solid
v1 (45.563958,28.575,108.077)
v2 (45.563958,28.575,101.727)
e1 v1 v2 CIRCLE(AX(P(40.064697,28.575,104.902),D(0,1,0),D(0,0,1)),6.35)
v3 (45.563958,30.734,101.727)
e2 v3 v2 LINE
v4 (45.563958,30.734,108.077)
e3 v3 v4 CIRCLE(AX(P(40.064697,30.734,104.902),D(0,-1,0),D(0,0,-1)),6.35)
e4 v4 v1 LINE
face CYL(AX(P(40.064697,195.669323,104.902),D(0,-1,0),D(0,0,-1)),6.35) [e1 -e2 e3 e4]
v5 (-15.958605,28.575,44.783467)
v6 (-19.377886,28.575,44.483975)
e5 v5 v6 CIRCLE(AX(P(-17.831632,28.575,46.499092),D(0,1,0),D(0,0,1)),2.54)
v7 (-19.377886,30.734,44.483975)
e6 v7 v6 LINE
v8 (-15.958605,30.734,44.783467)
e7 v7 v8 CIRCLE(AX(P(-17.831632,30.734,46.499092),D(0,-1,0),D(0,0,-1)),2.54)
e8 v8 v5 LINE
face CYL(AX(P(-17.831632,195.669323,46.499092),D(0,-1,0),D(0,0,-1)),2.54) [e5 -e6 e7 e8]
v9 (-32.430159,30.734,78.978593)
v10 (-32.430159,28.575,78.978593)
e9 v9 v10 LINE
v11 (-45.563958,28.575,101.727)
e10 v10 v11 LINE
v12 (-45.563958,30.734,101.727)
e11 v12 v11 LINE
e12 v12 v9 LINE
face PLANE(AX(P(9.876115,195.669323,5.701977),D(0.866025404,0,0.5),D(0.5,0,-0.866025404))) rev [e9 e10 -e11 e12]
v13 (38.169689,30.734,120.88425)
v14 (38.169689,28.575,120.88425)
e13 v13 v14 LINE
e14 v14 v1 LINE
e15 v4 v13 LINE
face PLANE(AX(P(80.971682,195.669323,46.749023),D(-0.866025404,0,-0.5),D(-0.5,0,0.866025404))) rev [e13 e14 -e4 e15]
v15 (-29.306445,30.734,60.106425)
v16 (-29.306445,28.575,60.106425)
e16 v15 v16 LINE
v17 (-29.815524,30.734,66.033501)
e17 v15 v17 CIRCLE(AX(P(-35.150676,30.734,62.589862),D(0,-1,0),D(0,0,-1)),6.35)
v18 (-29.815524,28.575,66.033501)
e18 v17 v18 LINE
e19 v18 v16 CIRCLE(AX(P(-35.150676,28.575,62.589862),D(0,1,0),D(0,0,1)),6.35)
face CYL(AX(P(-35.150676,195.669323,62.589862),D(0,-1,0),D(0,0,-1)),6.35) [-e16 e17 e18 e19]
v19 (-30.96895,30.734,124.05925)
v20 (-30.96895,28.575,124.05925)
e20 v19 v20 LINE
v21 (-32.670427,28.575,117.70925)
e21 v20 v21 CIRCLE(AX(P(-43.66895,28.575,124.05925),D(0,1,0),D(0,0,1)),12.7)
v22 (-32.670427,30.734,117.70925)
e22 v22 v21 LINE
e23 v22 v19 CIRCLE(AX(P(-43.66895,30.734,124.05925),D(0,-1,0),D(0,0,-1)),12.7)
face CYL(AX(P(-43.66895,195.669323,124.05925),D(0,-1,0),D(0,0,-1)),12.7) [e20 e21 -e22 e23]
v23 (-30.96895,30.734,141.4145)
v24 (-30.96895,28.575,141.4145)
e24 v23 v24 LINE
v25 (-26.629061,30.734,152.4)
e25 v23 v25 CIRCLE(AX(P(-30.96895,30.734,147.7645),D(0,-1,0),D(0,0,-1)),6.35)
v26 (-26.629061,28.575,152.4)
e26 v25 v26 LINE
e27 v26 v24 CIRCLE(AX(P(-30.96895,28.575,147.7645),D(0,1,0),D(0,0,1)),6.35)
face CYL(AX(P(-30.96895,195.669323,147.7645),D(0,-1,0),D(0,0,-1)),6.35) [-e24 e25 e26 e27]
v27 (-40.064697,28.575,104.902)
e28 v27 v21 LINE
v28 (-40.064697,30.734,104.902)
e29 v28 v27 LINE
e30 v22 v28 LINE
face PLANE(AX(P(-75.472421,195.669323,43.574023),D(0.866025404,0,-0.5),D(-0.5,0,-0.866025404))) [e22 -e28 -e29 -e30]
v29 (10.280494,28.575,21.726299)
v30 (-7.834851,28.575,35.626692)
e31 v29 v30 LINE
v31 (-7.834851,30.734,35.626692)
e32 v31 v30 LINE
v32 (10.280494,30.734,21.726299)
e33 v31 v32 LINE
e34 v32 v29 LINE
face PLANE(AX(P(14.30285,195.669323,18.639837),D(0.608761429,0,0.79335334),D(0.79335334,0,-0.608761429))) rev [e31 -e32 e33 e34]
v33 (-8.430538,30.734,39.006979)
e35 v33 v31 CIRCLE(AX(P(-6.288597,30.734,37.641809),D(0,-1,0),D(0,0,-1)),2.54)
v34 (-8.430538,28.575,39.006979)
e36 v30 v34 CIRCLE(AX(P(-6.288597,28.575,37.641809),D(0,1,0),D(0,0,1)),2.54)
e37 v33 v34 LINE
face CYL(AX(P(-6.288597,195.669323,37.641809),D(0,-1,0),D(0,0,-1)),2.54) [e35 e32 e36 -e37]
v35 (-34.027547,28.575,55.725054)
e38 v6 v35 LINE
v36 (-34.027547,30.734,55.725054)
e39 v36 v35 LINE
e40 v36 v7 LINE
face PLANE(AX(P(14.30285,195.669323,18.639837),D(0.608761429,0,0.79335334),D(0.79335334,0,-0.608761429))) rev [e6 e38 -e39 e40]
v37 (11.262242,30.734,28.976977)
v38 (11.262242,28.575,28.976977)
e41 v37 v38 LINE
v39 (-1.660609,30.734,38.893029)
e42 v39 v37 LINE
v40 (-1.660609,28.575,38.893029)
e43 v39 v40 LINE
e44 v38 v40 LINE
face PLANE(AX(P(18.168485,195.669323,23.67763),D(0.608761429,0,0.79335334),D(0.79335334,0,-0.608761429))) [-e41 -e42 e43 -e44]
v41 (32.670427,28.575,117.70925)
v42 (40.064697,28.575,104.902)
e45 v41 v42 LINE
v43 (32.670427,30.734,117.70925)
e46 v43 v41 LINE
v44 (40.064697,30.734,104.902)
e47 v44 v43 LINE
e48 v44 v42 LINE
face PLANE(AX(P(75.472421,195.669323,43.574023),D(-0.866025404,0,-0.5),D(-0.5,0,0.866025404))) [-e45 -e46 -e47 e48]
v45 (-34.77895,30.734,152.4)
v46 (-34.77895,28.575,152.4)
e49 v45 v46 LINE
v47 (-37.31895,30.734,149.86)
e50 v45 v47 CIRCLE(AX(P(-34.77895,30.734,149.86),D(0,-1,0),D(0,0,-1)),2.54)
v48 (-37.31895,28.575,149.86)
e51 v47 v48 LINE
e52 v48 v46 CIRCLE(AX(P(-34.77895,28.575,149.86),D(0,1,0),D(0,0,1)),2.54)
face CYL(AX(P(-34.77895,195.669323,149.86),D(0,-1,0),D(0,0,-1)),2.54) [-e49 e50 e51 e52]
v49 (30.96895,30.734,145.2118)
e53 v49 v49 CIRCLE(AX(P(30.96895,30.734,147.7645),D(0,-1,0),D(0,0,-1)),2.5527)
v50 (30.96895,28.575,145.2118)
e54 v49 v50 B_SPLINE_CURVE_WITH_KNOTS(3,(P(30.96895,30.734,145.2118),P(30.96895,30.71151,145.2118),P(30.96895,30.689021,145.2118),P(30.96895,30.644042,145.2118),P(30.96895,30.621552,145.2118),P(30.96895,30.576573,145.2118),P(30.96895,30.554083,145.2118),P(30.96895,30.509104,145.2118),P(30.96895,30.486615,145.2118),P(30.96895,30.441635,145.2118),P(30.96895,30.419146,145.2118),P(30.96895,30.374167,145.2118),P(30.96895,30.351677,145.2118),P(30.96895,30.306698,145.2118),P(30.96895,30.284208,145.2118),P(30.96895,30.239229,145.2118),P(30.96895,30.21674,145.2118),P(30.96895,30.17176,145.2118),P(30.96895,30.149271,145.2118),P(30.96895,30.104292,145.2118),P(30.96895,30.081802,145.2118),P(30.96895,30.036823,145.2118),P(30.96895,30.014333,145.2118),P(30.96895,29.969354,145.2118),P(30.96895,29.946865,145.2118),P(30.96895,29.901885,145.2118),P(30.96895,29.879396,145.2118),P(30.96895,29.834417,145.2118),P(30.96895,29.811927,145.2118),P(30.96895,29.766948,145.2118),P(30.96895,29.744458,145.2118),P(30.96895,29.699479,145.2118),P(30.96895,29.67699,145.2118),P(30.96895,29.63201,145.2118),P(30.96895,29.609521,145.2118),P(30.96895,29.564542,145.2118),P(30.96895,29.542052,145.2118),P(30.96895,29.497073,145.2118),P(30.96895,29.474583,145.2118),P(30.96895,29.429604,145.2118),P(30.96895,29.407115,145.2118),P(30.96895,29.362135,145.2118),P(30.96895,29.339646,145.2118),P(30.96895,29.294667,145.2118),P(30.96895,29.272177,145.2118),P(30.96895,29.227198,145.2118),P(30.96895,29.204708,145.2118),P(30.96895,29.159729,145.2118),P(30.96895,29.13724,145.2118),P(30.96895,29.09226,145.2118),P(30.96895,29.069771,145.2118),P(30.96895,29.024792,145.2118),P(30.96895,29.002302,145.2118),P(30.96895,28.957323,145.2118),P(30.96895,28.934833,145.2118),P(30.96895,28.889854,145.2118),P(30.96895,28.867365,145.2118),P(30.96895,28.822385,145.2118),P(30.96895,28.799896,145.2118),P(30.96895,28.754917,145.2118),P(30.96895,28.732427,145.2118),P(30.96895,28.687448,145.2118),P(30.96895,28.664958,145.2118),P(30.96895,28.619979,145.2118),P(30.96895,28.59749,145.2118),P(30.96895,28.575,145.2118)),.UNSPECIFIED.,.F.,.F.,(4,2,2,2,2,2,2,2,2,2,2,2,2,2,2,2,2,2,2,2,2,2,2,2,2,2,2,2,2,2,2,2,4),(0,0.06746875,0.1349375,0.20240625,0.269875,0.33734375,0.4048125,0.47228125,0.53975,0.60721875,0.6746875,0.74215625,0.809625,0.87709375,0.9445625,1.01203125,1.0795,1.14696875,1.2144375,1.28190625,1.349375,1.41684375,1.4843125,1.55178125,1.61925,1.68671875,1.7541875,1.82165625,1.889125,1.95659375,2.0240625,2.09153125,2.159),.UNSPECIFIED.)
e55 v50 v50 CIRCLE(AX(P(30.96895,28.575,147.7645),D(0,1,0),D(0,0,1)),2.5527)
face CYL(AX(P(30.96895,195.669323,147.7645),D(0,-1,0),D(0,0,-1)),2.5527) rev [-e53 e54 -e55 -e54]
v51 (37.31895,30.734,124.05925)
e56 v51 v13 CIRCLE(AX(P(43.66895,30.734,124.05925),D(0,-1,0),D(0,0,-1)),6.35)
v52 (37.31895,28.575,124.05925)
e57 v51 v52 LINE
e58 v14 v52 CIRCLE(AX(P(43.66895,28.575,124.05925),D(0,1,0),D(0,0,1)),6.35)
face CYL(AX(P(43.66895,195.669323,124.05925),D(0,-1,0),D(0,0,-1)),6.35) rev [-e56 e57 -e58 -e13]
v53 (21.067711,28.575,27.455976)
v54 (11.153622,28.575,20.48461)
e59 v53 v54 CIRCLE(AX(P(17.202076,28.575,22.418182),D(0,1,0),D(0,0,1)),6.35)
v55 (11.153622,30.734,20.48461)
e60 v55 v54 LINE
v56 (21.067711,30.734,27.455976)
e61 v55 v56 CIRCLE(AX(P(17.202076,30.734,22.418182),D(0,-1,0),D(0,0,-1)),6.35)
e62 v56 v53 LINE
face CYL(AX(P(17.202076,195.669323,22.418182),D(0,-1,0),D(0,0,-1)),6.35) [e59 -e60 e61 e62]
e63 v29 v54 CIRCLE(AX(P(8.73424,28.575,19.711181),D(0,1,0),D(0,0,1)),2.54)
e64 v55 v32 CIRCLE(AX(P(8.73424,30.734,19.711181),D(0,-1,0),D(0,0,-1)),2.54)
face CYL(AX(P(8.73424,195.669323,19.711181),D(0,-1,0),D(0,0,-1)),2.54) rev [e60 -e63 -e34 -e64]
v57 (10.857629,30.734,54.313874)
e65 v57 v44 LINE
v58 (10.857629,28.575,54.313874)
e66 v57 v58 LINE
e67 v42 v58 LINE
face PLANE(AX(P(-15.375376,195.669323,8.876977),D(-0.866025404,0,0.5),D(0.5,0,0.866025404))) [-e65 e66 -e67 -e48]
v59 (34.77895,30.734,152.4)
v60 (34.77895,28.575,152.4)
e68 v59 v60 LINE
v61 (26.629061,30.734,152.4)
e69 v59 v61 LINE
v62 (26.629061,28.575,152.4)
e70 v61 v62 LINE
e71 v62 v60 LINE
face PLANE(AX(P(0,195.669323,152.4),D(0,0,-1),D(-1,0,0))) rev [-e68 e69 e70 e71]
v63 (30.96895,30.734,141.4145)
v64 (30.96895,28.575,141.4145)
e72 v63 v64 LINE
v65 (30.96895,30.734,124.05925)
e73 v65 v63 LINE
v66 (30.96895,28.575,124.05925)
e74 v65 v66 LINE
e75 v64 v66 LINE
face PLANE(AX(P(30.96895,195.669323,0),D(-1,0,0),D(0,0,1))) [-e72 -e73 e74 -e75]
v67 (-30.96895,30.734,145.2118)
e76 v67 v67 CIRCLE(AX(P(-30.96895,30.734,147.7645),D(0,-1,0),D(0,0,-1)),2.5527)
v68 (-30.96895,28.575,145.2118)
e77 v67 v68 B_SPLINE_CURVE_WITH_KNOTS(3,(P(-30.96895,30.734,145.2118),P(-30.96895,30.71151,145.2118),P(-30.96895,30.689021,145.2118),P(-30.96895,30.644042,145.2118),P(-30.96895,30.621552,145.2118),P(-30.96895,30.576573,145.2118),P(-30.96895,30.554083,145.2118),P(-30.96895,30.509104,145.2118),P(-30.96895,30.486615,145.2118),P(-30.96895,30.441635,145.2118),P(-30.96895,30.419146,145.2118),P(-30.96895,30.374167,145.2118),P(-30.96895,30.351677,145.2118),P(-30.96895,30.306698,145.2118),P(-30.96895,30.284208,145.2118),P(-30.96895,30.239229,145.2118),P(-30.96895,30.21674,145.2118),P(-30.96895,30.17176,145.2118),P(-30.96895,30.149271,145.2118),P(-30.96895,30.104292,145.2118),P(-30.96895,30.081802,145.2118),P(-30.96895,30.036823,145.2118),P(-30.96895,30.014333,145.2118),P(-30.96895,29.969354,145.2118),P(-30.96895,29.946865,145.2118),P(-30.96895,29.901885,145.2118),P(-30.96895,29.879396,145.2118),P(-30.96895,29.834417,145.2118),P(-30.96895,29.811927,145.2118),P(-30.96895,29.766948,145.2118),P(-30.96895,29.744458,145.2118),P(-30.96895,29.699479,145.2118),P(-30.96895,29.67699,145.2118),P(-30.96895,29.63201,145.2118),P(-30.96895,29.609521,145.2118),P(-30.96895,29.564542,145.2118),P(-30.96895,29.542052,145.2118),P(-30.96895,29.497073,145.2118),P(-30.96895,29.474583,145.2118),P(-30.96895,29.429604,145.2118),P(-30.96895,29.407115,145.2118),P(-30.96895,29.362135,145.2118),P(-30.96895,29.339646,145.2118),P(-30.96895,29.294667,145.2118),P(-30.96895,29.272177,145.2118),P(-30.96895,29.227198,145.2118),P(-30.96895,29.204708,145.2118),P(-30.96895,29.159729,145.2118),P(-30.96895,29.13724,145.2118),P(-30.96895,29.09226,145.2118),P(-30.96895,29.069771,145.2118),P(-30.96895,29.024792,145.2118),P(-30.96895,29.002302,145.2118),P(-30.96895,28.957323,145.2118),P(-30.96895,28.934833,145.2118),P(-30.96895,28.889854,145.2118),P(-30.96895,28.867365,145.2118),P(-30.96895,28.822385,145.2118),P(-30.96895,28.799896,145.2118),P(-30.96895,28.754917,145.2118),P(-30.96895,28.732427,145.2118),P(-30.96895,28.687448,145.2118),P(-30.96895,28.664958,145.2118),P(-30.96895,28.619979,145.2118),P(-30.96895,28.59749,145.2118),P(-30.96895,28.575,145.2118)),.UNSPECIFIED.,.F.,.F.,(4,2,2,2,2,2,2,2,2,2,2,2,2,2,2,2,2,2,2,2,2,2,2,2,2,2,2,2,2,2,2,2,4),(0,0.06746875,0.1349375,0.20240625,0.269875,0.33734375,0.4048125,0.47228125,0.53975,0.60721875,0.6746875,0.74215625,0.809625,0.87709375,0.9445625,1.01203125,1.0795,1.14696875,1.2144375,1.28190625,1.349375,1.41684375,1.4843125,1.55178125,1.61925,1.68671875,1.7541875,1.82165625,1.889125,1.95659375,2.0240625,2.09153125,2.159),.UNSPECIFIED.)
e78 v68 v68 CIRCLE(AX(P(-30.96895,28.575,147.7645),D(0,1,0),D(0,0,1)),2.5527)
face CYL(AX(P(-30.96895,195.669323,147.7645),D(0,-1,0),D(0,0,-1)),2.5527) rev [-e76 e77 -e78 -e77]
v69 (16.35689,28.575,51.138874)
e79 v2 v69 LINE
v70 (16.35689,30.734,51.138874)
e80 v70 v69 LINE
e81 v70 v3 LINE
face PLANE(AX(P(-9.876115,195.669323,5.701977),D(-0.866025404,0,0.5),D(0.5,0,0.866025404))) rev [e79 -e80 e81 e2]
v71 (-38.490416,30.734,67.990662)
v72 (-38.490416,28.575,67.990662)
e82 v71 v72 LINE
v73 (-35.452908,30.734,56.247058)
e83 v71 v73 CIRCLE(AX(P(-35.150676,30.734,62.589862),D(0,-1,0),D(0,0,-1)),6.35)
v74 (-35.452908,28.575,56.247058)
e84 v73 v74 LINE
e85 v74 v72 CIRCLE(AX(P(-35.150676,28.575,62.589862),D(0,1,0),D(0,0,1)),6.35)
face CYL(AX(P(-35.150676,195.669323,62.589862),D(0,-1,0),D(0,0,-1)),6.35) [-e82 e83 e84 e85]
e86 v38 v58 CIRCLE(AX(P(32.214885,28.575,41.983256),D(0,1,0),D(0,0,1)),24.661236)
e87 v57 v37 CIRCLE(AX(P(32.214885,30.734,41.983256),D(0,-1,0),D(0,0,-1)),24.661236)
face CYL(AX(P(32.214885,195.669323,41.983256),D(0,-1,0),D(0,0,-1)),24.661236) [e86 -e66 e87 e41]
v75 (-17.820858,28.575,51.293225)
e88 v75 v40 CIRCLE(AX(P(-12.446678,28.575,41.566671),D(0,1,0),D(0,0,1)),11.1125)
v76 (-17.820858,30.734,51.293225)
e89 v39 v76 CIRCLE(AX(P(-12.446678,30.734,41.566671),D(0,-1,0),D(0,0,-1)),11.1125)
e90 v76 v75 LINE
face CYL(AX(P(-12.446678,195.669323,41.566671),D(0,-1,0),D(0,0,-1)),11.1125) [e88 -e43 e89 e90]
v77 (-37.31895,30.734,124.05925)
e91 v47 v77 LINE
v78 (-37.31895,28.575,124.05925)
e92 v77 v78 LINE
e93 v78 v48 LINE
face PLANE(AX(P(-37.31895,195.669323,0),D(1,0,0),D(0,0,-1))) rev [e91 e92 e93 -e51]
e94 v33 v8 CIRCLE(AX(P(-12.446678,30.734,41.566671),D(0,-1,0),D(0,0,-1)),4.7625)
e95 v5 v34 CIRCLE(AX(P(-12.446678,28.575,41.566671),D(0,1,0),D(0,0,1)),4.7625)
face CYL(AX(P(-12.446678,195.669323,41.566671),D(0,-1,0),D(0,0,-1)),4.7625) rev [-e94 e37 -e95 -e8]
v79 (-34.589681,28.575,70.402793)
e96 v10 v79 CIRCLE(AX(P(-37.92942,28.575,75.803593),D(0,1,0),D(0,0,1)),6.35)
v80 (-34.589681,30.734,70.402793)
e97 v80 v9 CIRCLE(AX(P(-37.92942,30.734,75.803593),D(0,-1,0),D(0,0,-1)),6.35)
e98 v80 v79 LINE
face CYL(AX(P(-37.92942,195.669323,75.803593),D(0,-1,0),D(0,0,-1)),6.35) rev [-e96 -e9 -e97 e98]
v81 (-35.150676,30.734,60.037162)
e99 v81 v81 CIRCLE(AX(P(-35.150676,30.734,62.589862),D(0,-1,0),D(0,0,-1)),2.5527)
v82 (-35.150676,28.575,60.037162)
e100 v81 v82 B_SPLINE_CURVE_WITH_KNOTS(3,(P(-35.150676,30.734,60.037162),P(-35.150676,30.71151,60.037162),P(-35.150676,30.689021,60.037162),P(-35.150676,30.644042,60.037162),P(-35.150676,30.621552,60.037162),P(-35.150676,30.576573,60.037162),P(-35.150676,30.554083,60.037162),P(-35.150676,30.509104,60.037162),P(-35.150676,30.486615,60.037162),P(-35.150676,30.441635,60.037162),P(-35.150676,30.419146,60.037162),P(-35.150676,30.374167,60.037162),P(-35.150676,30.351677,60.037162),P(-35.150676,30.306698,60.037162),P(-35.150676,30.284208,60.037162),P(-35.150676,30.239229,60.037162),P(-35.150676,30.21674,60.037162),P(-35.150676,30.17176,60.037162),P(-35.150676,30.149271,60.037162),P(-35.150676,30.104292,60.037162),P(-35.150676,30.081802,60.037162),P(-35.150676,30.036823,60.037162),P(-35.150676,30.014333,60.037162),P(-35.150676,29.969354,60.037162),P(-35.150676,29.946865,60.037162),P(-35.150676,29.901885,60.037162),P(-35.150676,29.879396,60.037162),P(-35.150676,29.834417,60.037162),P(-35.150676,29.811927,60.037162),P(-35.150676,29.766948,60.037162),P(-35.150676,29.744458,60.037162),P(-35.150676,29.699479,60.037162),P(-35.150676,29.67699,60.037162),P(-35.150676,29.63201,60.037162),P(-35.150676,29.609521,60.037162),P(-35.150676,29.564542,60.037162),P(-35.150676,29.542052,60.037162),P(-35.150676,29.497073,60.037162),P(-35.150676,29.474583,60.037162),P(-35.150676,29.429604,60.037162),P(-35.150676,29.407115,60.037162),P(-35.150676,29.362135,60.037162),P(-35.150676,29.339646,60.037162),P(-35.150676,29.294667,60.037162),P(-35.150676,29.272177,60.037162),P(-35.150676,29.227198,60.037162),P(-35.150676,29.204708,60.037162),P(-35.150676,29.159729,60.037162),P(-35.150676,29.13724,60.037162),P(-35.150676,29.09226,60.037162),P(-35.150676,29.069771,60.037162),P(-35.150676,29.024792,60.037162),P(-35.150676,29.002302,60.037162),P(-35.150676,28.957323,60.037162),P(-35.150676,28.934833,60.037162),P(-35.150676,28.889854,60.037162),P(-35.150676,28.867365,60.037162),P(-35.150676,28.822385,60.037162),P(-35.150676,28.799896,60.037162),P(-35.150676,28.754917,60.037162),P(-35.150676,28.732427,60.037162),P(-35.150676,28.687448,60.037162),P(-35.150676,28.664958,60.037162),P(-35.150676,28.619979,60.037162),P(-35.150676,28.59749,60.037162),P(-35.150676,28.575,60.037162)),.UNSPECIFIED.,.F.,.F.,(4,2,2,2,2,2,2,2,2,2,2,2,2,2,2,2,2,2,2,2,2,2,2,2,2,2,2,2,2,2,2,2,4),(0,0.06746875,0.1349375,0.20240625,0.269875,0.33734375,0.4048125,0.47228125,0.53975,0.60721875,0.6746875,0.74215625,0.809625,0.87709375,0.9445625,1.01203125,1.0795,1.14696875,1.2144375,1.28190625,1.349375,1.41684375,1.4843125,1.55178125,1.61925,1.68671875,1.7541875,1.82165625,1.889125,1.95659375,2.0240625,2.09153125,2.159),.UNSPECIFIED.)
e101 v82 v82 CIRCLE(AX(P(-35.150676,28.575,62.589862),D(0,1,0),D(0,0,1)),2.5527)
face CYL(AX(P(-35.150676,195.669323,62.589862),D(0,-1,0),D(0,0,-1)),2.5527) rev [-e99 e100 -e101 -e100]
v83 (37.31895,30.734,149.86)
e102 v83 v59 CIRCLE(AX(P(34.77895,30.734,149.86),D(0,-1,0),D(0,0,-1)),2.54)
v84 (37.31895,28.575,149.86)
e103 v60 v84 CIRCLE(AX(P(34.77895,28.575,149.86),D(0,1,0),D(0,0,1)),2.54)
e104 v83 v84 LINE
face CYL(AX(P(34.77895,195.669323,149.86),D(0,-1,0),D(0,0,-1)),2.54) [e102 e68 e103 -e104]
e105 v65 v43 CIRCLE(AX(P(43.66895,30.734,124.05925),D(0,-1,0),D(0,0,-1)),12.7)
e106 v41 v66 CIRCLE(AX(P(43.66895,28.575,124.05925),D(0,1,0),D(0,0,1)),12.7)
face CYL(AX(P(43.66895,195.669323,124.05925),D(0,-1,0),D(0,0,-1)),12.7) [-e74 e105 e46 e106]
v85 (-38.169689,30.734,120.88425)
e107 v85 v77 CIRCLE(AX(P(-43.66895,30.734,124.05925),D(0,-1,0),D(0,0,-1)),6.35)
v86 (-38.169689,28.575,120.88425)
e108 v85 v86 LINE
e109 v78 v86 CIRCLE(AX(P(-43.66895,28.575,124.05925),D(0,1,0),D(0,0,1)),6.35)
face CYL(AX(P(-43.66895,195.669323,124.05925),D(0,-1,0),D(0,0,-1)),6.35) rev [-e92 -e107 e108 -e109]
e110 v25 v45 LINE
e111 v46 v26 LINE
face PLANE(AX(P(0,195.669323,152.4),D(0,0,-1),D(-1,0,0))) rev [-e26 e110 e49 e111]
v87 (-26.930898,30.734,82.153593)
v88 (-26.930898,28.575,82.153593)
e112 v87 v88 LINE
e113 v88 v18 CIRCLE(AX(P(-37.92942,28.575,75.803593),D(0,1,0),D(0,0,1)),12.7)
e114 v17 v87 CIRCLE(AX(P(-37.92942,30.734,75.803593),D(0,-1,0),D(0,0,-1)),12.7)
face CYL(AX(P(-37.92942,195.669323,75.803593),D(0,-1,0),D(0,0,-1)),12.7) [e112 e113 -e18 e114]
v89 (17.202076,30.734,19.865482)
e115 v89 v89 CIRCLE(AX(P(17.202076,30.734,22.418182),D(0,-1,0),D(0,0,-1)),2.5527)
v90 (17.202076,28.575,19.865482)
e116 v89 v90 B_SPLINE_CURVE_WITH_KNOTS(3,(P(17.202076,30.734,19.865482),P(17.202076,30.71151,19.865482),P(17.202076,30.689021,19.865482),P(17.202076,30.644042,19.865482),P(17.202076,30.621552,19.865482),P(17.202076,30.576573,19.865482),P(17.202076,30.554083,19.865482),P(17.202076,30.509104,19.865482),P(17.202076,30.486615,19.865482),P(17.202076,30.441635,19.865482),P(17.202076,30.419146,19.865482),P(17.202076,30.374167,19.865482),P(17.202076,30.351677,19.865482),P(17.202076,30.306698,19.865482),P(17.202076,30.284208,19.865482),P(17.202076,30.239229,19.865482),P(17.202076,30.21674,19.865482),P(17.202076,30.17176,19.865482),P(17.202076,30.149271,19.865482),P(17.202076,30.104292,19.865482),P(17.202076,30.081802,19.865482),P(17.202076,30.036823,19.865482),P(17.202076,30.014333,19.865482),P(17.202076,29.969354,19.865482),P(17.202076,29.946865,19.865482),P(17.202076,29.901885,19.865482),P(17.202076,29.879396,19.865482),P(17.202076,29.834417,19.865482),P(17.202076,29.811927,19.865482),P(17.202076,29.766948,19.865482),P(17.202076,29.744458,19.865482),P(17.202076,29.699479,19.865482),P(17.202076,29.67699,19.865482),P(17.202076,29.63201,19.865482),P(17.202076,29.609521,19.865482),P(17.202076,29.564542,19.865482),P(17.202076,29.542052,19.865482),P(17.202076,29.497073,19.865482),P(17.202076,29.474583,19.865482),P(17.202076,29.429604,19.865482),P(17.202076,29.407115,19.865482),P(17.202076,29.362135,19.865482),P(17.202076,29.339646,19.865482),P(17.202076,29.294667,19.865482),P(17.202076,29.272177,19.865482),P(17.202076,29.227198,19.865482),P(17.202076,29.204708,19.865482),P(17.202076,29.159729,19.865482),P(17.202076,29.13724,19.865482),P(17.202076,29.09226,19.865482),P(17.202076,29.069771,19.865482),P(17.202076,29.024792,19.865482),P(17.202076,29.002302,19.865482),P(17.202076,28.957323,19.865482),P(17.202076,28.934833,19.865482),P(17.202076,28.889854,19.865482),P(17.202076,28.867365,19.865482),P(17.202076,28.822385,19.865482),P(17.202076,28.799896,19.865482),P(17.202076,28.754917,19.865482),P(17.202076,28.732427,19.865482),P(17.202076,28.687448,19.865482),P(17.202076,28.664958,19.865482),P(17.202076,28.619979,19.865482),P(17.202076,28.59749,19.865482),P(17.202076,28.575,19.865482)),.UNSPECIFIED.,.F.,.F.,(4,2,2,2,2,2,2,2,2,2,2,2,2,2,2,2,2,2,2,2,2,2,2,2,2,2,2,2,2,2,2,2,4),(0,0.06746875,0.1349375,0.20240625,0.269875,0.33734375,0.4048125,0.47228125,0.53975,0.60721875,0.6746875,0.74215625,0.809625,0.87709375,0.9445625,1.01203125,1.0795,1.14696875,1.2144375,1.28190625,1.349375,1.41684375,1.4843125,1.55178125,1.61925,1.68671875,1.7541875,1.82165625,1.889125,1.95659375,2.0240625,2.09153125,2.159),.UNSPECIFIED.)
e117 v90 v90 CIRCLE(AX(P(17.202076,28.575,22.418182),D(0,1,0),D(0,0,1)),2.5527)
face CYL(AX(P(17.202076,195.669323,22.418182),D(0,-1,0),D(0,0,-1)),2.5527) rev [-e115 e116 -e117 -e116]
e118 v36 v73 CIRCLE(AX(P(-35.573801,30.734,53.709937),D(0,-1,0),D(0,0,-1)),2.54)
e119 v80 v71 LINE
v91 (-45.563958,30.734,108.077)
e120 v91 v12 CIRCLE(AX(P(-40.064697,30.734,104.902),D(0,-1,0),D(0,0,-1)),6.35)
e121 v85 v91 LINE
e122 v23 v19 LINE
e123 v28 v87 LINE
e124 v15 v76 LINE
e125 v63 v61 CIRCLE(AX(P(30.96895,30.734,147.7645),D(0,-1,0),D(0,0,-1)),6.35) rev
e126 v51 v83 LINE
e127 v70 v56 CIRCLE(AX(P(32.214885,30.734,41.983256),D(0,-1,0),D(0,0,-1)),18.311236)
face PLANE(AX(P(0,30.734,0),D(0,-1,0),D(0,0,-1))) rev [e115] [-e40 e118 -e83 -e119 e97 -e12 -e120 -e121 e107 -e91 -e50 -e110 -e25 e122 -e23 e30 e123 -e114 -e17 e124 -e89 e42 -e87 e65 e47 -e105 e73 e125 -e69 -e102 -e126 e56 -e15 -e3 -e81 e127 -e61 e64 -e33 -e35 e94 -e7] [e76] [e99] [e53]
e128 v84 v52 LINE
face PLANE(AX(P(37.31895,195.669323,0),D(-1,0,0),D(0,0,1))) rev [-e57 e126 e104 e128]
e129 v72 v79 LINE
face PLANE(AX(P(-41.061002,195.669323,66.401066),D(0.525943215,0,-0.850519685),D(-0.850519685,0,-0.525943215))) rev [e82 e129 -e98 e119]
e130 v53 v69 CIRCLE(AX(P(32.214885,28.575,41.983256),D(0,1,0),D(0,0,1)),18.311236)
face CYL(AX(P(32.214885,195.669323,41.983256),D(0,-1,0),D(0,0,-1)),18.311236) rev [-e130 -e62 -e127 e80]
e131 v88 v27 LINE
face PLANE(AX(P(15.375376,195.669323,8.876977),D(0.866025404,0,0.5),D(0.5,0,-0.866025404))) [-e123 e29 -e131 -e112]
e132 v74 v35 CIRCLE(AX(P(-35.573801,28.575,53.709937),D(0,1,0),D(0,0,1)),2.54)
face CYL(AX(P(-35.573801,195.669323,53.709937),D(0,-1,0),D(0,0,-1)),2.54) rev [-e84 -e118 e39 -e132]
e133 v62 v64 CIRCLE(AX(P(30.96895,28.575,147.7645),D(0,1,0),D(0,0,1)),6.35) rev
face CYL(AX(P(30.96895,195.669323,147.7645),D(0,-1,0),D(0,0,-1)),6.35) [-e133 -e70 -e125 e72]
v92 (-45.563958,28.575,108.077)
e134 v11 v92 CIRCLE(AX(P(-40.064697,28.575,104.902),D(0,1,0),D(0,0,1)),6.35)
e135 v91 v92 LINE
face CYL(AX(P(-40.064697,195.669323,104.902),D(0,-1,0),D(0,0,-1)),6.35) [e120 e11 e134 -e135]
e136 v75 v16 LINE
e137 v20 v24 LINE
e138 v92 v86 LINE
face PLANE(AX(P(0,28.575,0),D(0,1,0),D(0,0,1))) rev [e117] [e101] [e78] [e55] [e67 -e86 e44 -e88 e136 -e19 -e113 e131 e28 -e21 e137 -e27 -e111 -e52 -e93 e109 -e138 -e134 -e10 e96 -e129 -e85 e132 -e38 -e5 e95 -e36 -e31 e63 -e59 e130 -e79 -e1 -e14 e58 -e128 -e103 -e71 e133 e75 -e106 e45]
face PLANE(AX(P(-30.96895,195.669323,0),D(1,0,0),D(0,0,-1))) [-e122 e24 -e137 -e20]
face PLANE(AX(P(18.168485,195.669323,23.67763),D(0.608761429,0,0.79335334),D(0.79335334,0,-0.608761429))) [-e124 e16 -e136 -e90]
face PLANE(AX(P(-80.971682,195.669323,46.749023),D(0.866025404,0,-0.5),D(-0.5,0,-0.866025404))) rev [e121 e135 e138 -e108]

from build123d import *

# Parameters (mm, degrees)
SKETCH44_R              = 2.5527
TOP_PLATE_EXTRUDE_DEPTH = 3.175
SKETCH82_R              = 4.7625
CUT_EXTRUDE38_DEPTH     = 3.175
SKETCH72_W              = 4.7498
SKETCH72_H              = 17.4625
SKETCH72_W_2            = 49.2125
SKETCH72_H_2            = 3.0226
SKETCH72_H_3            = 18.806813894
SKETCH72_W_3            = 12.7
SKETCH72_H_4            = 9.525
BOSS_EXTRUDE27_DEPTH    = 3.175
SKETCH86_R              = 6.35
SKETCH86_R_2            = 2.5527
BOSS_EXTRUDE31_DEPTH    = 3.175
SKETCH111_W             = 17.7673
SKETCH111_H             = 10.0965
CUT_EXTRUDE57_DEPTH     = 191.266761417
SKETCH92_W              = 4.859785226
SKETCH92_H              = 15.6845
SKETCH92_W_2            = 4.8768
SKETCH92_H_2            = 22.987
SKETCH92_W_3            = 6.1468
SKETCH92_H_3            = 3.1496
SKETCH92_W_4            = 13.95095
SKETCH92_W_5            = 15.24635
CUT_EXTRUDE44_DEPTH     = 191.266761417
SKETCH95_R              = 2.5527
CUT_EXTRUDE47_DEPTH     = 25.4
SKETCH99_R              = 3.175
CUT_EXTRUDE50_DEPTH     = 191.266761417
CUT_EXTRUDE58_DEPTH     = 191.266761417
SKETCH115_W             = 1.905
SKETCH115_H             = 7.409255477
CUT_EXTRUDE60_DEPTH     = 191.266761417
FILLET5_R               = 2.54
FILLET6_R               = 2.54
FILLET7_R               = 2.54
FILLET8_R               = 1.905
SKETCH113_R             = 0.508
CUT_EXTRUDE59_DEPTH     = 191.266761558
FILLET43_R              = 0.635
FILLET43_OF_MIRROR29_R  = 0.635
BOSS_EXTRUDE32_START    = 2.159
SKETCH116_R             = 2.5527
BOSS_EXTRUDE32_DEPTH    = 3.175
CUT_EXTRUDE61_DEPTH     = 191.315032208
BOSS_EXTRUDE33_START    = 3.175
SKETCH118_R             = 2.5527
BOSS_EXTRUDE33_DEPTH    = 3.175
SKETCH119_R             = 2.5527
CUT_EXTRUDE62_DEPTH     = 191.43046765
CUT_EXTRUDE63_DEPTH     = 191.43046765
DELETEFACE1_START       = 30.734
DELETEFACE1_OUTLINE_R   = 2.5527
DELETEFACE1_DEPTH       = 3.175
CUT_EXTRUDE64_DEPTH     = 191.43046765
FILLET44_R              = 6.35
FILLET45_R              = 1.27
FILLET46_R              = 1.27
FILLET47_R              = 3.175
FILLET48_R              = 3.175
FILLET49_R              = 2.54
SKETCH122_R             = 2.5527
BOSS_EXTRUDE34_DEPTH    = 2.159


# Read off the part's stored shape, not the designer's step: DeleteFace1
with BuildPart() as part:
    # Sketch44 → Top Plate Extrude----------- (new body)
    with BuildSketch(Plane(origin=(0, 25.4, 0), x_dir=(1, 0, 0), z_dir=(0, 1, 0))):
        with BuildLine():
            Line((-104.775, -68.124686106), (-104.775, -152.527))
            Line((-104.775, -152.527), (104.775, -152.527))
            Line((104.775, -152.527), (104.775, -68.124686106))
            Line((104.775, -68.124686106), (92.075, -68.124686106))
            Line((92.075, -68.124686106), (92.075, -62.647632589))
            Line((92.075, -62.647632589), (21.81178084, -8.732768266))
            ThreePointArc((21.81178084, -8.732768266), (18.724426226, -14.191930366), (14.302849775, -18.63983673))
            Line((14.302849775, -18.63983673), (-38.049902469, -58.811516421))
            ThreePointArc((-38.049902469, -58.811516421), (-44.800532006, -62.419803084), (-52.352752243, -63.666679691))
            Line((-52.352752243, -63.666679691), (-92.075, -63.666679691))
            Line((-92.075, -63.666679691), (-92.075, -68.124686106))
            Line((-92.075, -68.124686106), (-104.775, -68.124686106))
        make_face()
        with Locations(Location((-73.83145, -147.7645, 0), (0, 0, 90))):
            Circle(SKETCH44_R, mode=Mode.SUBTRACT)
        with Locations(Location((-59.54395, -147.7645, 0), (0, 0, 90))):
            Circle(SKETCH44_R, mode=Mode.SUBTRACT)
        with Locations(Location((-45.25645, -147.7645, 0), (0, 0, 90))):
            Circle(SKETCH44_R, mode=Mode.SUBTRACT)
        with Locations(Location((-30.96895, -147.7645, 0), (0, 0, 90))):
            Circle(SKETCH44_R, mode=Mode.SUBTRACT)
        with Locations(Location((-100.0125, -99.6315, 0), (0, 0, 270))):
            Circle(SKETCH44_R, mode=Mode.SUBTRACT)
        with Locations(Location((-100.0125, -147.7645, 0), (0, 0, 270))):
            Circle(SKETCH44_R, mode=Mode.SUBTRACT)
        with Locations(Location((100.0125, -147.7645, 0), (0, 0, 90))):
            Circle(SKETCH44_R, mode=Mode.SUBTRACT)
        with Locations(Location((100.0125, -99.6315, 0), (0, 0, 90))):
            Circle(SKETCH44_R, mode=Mode.SUBTRACT)
        with Locations(Location((30.96895, -147.7645, 0), (0, 0, 270))):
            Circle(SKETCH44_R, mode=Mode.SUBTRACT)
        with Locations(Location((45.25645, -147.7645, 0), (0, 0, 270))):
            Circle(SKETCH44_R, mode=Mode.SUBTRACT)
        with Locations(Location((59.54395, -147.7645, 0), (0, 0, 270))):
            Circle(SKETCH44_R, mode=Mode.SUBTRACT)
        with Locations(Location((73.83145, -147.7645, 0), (0, 0, 270))):
            Circle(SKETCH44_R, mode=Mode.SUBTRACT)
        with Locations(Location((-87.3125, -68.429179691, 0), (0, 0, 270))):
            Circle(SKETCH44_R, mode=Mode.SUBTRACT)
        with Locations(Location((-35.150676163, -62.589861704, 0), (0, 0, 270))):
            Circle(SKETCH44_R, mode=Mode.SUBTRACT)
        with Locations(Location((17.20207608, -22.418182013, 0), (0, 0, 270))):
            Circle(SKETCH44_R, mode=Mode.SUBTRACT)
        with Locations(Location((45.531325629, -32.936414996, 0), (0, 0, 270))):
            Circle(SKETCH44_R, mode=Mode.SUBTRACT)
        with Locations(Location((87.3125, -64.996237681, 0), (0, 0, 270))):
            Circle(SKETCH44_R, mode=Mode.SUBTRACT)
        with Locations(Location((-97.155, -85.269686106, 0), (0, 0, 270))):
            Circle(SKETCH44_R, mode=Mode.SUBTRACT)
        with Locations(Location((24.42940612, -36.754342231, 0), (0, 0, 270))):
            Circle(SKETCH44_R, mode=Mode.SUBTRACT)
        with Locations(Location((97.155, -85.269686106, 0), (0, 0, 270))):
            Circle(SKETCH44_R, mode=Mode.SUBTRACT)
    extrude(amount=TOP_PLATE_EXTRUDE_DEPTH)

    # Sketch82 → Cut-Extrude38 (cut)
    with BuildSketch(Plane(origin=(0, 28.575, 0), x_dir=(1, 0, 0), z_dir=(0, 1, 0))):
        with Locations((-52.352752243, -65.571679691)):
            Circle(SKETCH82_R)
        with Locations((-12.44667807, -41.56667131)):
            Circle(SKETCH82_R)
        with Locations((58.296246284, -39.129483192)):
            Circle(SKETCH82_R)
        with BuildLine():
            Line((21.464274093, -9.555101394), (21.81178084, -8.732768266))
            Line((21.81178084, -8.732768266), (22.214272521, -9.041610995))
            ThreePointArc((22.214272521, -9.041610995), (27.20799018, -17.139845005), (21.464274093, -9.555101394))
        make_face()
    extrude(amount=-CUT_EXTRUDE38_DEPTH, mode=Mode.SUBTRACT)

    # Sketch72 → Boss-Extrude27 (add, through all)
    with BuildSketch(Plane(origin=(0, 25.4, 0), x_dir=(1, 0, 0), z_dir=(0, 1, 0))):
        with Locations((-107.1499, -143.79575)):
            Rectangle(SKETCH72_W, SKETCH72_H)
        with Locations((-52.4002, -154.0383)):
            Rectangle(SKETCH72_W_2, SKETCH72_H_2)
        with Locations((-107.1499, -102.928093053)):
            Rectangle(SKETCH72_W, SKETCH72_H_3)
        with Locations((-6.35, -154.0383)):
            Rectangle(SKETCH72_W_3, SKETCH72_H_2)
        with Locations((-107.1499, -72.887186106)):
            Rectangle(SKETCH72_W, SKETCH72_H_4)
        with Locations((-97.155, -154.0383)):
            Rectangle(SKETCH72_W_3, SKETCH72_H_2)
    boss_extrude27 = extrude(amount=BOSS_EXTRUDE27_DEPTH)

    # Mirror22: Boss-Extrude27 across plane
    add(boss_extrude27.mirror(Plane(origin=(0, 0, 0), x_dir=(0, 0, 1), z_dir=(1, 0, 0))))

    # Sketch86 → Boss-Extrude31 (add, through all)
    # profile 1 of 5: a face of its own
    with BuildSketch(Plane(origin=(0, 28.575, 0), x_dir=(1, 0, 0), z_dir=(0, 1, 0))):
        with Locations((87.3125, -64.996237681)):
            Circle(SKETCH86_R)
        with Locations(Location((87.3125, -64.996237681, 0), (0, 0, 270))):
            Circle(SKETCH86_R_2, mode=Mode.SUBTRACT)
    # profile 2 of 5: a face of its own
    with BuildSketch(Plane(origin=(0, 28.575, 0), x_dir=(1, 0, 0), z_dir=(0, 1, 0))):
        with Locations((17.20207608, -22.418182013)):
            Circle(SKETCH86_R)
        with Locations(Location((17.20207608, -22.418182013, 0), (0, 0, 270))):
            Circle(SKETCH86_R_2, mode=Mode.SUBTRACT)
    # profile 3 of 5: a face of its own
    with BuildSketch(Plane(origin=(0, 28.575, 0), x_dir=(1, 0, 0), z_dir=(0, 1, 0))):
        with Locations((45.531325629, -32.936414996)):
            Circle(SKETCH86_R)
        with Locations(Location((45.531325629, -32.936414996, 0), (0, 0, 270))):
            Circle(SKETCH86_R_2, mode=Mode.SUBTRACT)
    # profile 4 of 5: a face of its own
    with BuildSketch(Plane(origin=(0, 28.575, 0), x_dir=(1, 0, 0), z_dir=(0, 1, 0))):
        with Locations((-35.150676163, -62.589861704)):
            Circle(SKETCH86_R)
        with Locations(Location((-35.150676163, -62.589861704, 0), (0, 0, 270))):
            Circle(SKETCH86_R_2, mode=Mode.SUBTRACT)
    # profile 5 of 5: a face of its own
    with BuildSketch(Plane(origin=(0, 28.575, 0), x_dir=(1, 0, 0), z_dir=(0, 1, 0))):
        with Locations((-87.3125, -68.429179691)):
            Circle(SKETCH86_R)
        with Locations(Location((-87.3125, -68.429179691, 0), (0, 0, 270))):
            Circle(SKETCH86_R_2, mode=Mode.SUBTRACT)
    extrude(amount=-BOSS_EXTRUDE31_DEPTH)

    # Sketch111 → Cut-Extrude57 (cut, through all)
    with BuildSketch(Plane(origin=(0, 28.575, 0), x_dir=(1, 0, 0), z_dir=(0, 1, 0))):
        with Locations((-100.64115, -72.918936106)):
            Rectangle(SKETCH111_W, SKETCH111_H)
        with Locations((100.64115, -72.918936106)):
            Rectangle(SKETCH111_W, SKETCH111_H)
    extrude(amount=-CUT_EXTRUDE57_DEPTH, mode=Mode.SUBTRACT)

    # Sketch92 → Cut-Extrude44 (cut, through all)
    with BuildSketch(Plane(origin=(0, 28.575, 0), x_dir=(1, 0, 0), z_dir=(0, 1, 0))):
        with Locations((-107.094907387, -85.809436106)):
            Rectangle(SKETCH92_W, SKETCH92_H)
        with Locations((-107.0864, -123.698)):
            Rectangle(SKETCH92_W_2, SKETCH92_H_2)
        with Locations((-106.4514, -153.9748)):
            Rectangle(SKETCH92_W_3, SKETCH92_H_3)
        with Locations((-83.905725, -153.9748)):
            Rectangle(SKETCH92_W_4, SKETCH92_H_3)
        with Locations((-20.246975, -153.9748)):
            Rectangle(SKETCH92_W_5, SKETCH92_H_3)
    cut_extrude44 = extrude(amount=-CUT_EXTRUDE44_DEPTH, mode=Mode.SUBTRACT)

    # Mirror26: Cut-Extrude44 across plane
    add(cut_extrude44.mirror(Plane(origin=(0, 0, 0), x_dir=(0, 0, 1), z_dir=(1, 0, 0))), mode=Mode.SUBTRACT)

    # Sketch95 → Cut-Extrude47 (cut)
    with BuildSketch(Plane(origin=(0, 28.575, 0), x_dir=(1, 0, 0), z_dir=(0, 1, 0))):
        with BuildLine():
            Line((-14.966768676, -141.097), (14.966768676, -141.097))
            ThreePointArc((14.966768676, -141.097), (18.013644543, -132.45695017), (26.522246674, -135.853654954))
            Line((26.522246674, -135.853654954), (44.392192993, -104.902))
            Line((44.392192993, -104.902), (26.522246674, -73.950345046))
            ThreePointArc((26.522246674, -73.950345046), (18.013644543, -77.34704983), (14.966768676, -68.707))
            Line((14.966768676, -68.707), (-14.966768676, -68.707))
            ThreePointArc((-14.966768676, -68.707), (-18.013644543, -77.34704983), (-26.522246674, -73.950345046))
            Line((-26.522246674, -73.950345046), (-44.392192993, -104.902))
            Line((-44.392192993, -104.902), (-26.522246674, -135.853654954))
            ThreePointArc((-26.522246674, -135.853654954), (-18.013644543, -132.45695017), (-14.966768676, -141.097))
        make_face()
        with Locations(Location((-20.6375, -71.5645, 0), (0, 0, 270))):
            Circle(SKETCH95_R)
        with Locations(Location((20.6375, -71.5645, 0), (0, 0, 270))):
            Circle(SKETCH95_R)
        with Locations(Location((20.6375, -138.2395, 0), (0, 0, 270))):
            Circle(SKETCH95_R)
        with Locations(Location((-20.6375, -138.2395, 0), (0, 0, 270))):
            Circle(SKETCH95_R)
    extrude(amount=-CUT_EXTRUDE47_DEPTH, mode=Mode.SUBTRACT)

    # Sketch99 → Cut-Extrude50 (cut, through all)
    with BuildSketch(Plane(origin=(0, 28.575, 0), x_dir=(1, 0, 0), z_dir=(0, 1, 0))):
        with Locations(Location((-1.83388, -60.19546, 0), (0, 0, 270))):
            Circle(SKETCH99_R)
    extrude(amount=-CUT_EXTRUDE50_DEPTH, mode=Mode.SUBTRACT)

    # Sketch112 → Cut-Extrude58 (cut, through all)
    with BuildSketch(Plane(origin=(0, 28.575, 0), x_dir=(1, 0, 0), z_dir=(0, 1, 0))):
        Polygon((-26.522246674, -135.853654954), (-24.61895, -139.150261495), (-24.61895, -152.4), (-24.61895, -155.5496), (24.61895, -155.5496), (24.61895, -152.4), (24.61895, -139.150261495), (26.522246674, -135.853654954), (26.522246674, -131.8895), (-26.522246674, -131.8895), align=None)
    extrude(amount=-CUT_EXTRUDE58_DEPTH, mode=Mode.SUBTRACT)

    # Sketch115 → Cut-Extrude60 (cut, through all)
    with BuildSketch(Plane(origin=(0, 28.575, 0), x_dir=(1, 0, 0), z_dir=(0, 1, 0))):
        with BuildLine():
            Line((-91.7575, -67.870686106), (-93.637892076, -67.870686106))
            Line((-93.637892076, -67.870686106), (-93.637892076, -63.666679691))
            Line((-93.637892076, -63.666679691), (-91.7575, -63.666679691))
            Line((-91.7575, -63.666679691), (-91.512630206, -63.666679691))
            ThreePointArc((-91.512630206, -63.666679691), (-91.636564071, -63.778914117), (-91.7575, -63.894372639))
            Line((-91.7575, -63.894372639), (-91.7575, -67.870686106))
        make_face()
        with Locations((92.71, -64.166058367)):
            Rectangle(SKETCH115_W, SKETCH115_H)
    extrude(amount=-CUT_EXTRUDE60_DEPTH, mode=Mode.SUBTRACT)

    # Fillet5
    fillet5_edges = [part.edges().sort_by_distance(p)[0] for p in [
        (-44.392192993, 26.9875, 104.902),
        (-26.522246674, 26.9875, 73.950345046),
        (-14.966768676, 26.9875, 68.707),
        (14.966768676, 26.9875, 68.707),
        (26.522246674, 26.9875, 73.950345046),
        (44.392192993, 26.9875, 104.902),
        (24.61895, 26.9875, 139.150261495),
        (-24.61895, 26.9875, 139.150261495),
    ]]
    fillet(fillet5_edges, radius=FILLET5_R)

    # Fillet6
    fillet6_edges = [part.edges().sort_by_distance(p)[0] for p in [
        (-91.7575, 26.9875, 63.894372639),
        (91.7575, 26.9875, 60.461430629),
    ]]
    fillet(fillet6_edges, radius=FILLET6_R)

    # Fillet7
    fillet7_edges = [part.edges().sort_by_distance(p)[0] for p in [
        (-56.717655593, 26.9875, 63.666679691),
        (-17.069279245, 26.9875, 42.712517997),
        (-10.14345794, 26.9875, 37.398148396),
        (55.993026154, 26.9875, 34.960960278),
        (62.918847459, 26.9875, 40.275329879),
        (-48.171509306, 26.9875, 63.291632816),
        (29.140093826, 26.9875, 14.355980596),
        (86.879538977, 26.9875, 58.661015131),
        (17.141153982, 26.9875, 16.068474264),
        (10.970662446, 26.9875, 21.196713997),
        (51.762739264, 26.9875, 31.71494698),
        (45.098364606, 26.9875, 26.601192447),
        (-41.268255068, 26.9875, 60.88759018),
        (-34.71771514, 26.9875, 56.254639155),
        (-83.112369794, 26.9875, 63.666679691),
        (-104.665014774, 26.9875, 77.967186106),
        (104.665014774, 26.9875, 77.967186106),
    ]]
    fillet(fillet7_edges, radius=FILLET7_R)

    # Fillet8
    fillet8_edges = [part.edges().sort_by_distance(p)[0] for p in [
        (19.785658887, 26.9875, 12.670545663),
    ]]
    fillet(fillet8_edges, radius=FILLET8_R)

    # Sketch113 → Cut-Extrude59 (cut, through all)
    with BuildSketch(Plane(origin=(0, 28.575, 0), x_dir=(1, 0, 0), z_dir=(0, 1, 0))):
        with Locations((-91.7575, -77.967186106)):
            Circle(SKETCH113_R)
        with Locations((-104.665014774, -93.651686106)):
            Circle(SKETCH113_R)
        with Locations((-104.648, -112.2045)):
            Circle(SKETCH113_R)
        with Locations((-104.648, -135.1915)):
            Circle(SKETCH113_R)
        with Locations((-103.378, -152.4)):
            Circle(SKETCH113_R)
        with Locations((-90.8812, -152.4)):
            Circle(SKETCH113_R)
        with Locations((-76.93025, -152.4)):
            Circle(SKETCH113_R)
        with Locations((-27.87015, -152.4)):
            Circle(SKETCH113_R)
    cut_extrude59 = extrude(amount=-CUT_EXTRUDE59_DEPTH, mode=Mode.SUBTRACT)

    # Fillet43
    fillet43_edges = [part.edges().sort_by_distance(p)[0] for p in [
        (-103.886, 26.9875, 152.4),
        (-76.93025, 26.9875, 152.908),
        (-90.3732, 26.9875, 152.4),
        (-105.156, 26.9875, 135.1915),
        (-104.648, 26.9875, 112.7125),
        (-27.36215, 26.9875, 152.4),
        (-105.173014774, 26.9875, 93.651686106),
        (-91.7575, 26.9875, 77.459186106),
        (-92.2655, 26.9875, 77.967186106),
        (-104.665014774, 26.9875, 93.143686106),
        (-105.156, 26.9875, 112.2045),
        (-104.648, 26.9875, 134.6835),
        (-103.378, 26.9875, 152.908),
        (-90.8812, 26.9875, 152.908),
        (-77.43825, 26.9875, 152.4),
        (-27.87015, 26.9875, 152.908),
    ]]
    fillet(fillet43_edges, radius=FILLET43_R)

    # Mirror29: Cut-Extrude59 across plane
    add(cut_extrude59.mirror(Plane(origin=(0, 0, 0), x_dir=(0, 0, 1), z_dir=(1, 0, 0))), mode=Mode.SUBTRACT)

    # Fillet43 of Mirror29
    fillet43_of_mirror29_edges = [part.edges().sort_by_distance(p)[0] for p in [
        (103.886, 26.9875, 152.4),
        (76.93025, 26.9875, 152.908),
        (90.3732, 26.9875, 152.4),
        (105.156, 26.9875, 135.1915),
        (104.648, 26.9875, 112.7125),
        (27.36215, 26.9875, 152.4),
        (105.173014774, 26.9875, 93.651686106),
        (91.7575, 26.9875, 77.459186106),
        (92.2655, 26.9875, 77.967186106),
        (104.665014774, 26.9875, 93.143686106),
        (105.156, 26.9875, 112.2045),
        (104.648, 26.9875, 134.6835),
        (103.378, 26.9875, 152.908),
        (90.8812, 26.9875, 152.908),
        (77.43825, 26.9875, 152.4),
        (27.87015, 26.9875, 152.908),
    ]]
    fillet(fillet43_of_mirror29_edges, radius=FILLET43_OF_MIRROR29_R)

    # Sketch117 → Cut-Extrude61 (cut, through all)
    with BuildSketch(Plane(origin=(0, 28.575, 0), x_dir=(1, 0, 0), z_dir=(0, 1, 0))):
        with BuildLine():
            Line((26.828159473, -37.627417051), (25.525062727, -41.207645937))
            ThreePointArc((25.525062727, -41.207645937), (22.253234554, -42.73332447), (20.727556021, -39.461496297))
            Line((20.727556021, -39.461496297), (22.030652767, -35.881267412))
            ThreePointArc((22.030652767, -35.881267412), (25.30248094, -34.355588878), (26.828159473, -37.627417051))
        make_face()
        with BuildLine():
            Line((1.34112, -60.19546), (1.34112, -61.78296))
            ThreePointArc((1.34112, -61.78296), (-1.83388, -64.95796), (-5.00888, -61.78296))
            Line((-5.00888, -61.78296), (-5.00888, -60.19546))
            ThreePointArc((-5.00888, -60.19546), (-1.83388, -57.02046), (1.34112, -60.19546))
        make_face()
    extrude(amount=-CUT_EXTRUDE61_DEPTH, mode=Mode.SUBTRACT)

    # Sketch119 → Cut-Extrude62 (cut, through all)
    with BuildSketch(Plane.XZ.offset(-25.4)):
        with BuildLine():
            ThreePointArc((-24.618334265, 76.511767787), (-26.67742503, 75.993929451), (-28.410372496, 77.220674902))
            Line((-28.410372496, 77.220674902), (-28.410372496, 59.418844751))
            Line((-28.410372496, 59.418844751), (-16.707657981, 50.439036071))
            ThreePointArc((-16.707657981, 50.439036071), (-6.454943705, 49.375251561), (-2.773809056, 39.747217744))
            Line((-2.773809056, 39.747217744), (3.843489743, 34.669585789))
            Line((3.843489743, 34.669585789), (28.410372496, 77.220674902))
            ThreePointArc((28.410372496, 77.220674902), (26.67742503, 75.993929451), (24.618334265, 76.511767787))
            ThreePointArc((24.618334265, 76.511767787), (17.793005442, 77.24176613), (14.291551037, 71.337714286))
            ThreePointArc((14.291551037, 71.337714286), (13.581013661, 69.48331271), (11.753171452, 68.707))
            Line((11.753171452, 68.707), (-11.753171452, 68.707))
            ThreePointArc((-11.753171452, 68.707), (-13.581013661, 69.48331271), (-14.291551037, 71.337714286))
            ThreePointArc((-14.291551037, 71.337714286), (-17.793005442, 77.24176613), (-24.618334265, 76.511767787))
        make_face()
        with BuildLine():
            Line((1.34112, 61.78296), (1.34112, 60.19546))
            ThreePointArc((1.34112, 60.19546), (-1.83388, 57.02046), (-5.00888, 60.19546))
            Line((-5.00888, 60.19546), (-5.00888, 61.78296))
            ThreePointArc((-5.00888, 61.78296), (-1.83388, 64.95796), (1.34112, 61.78296))
        make_face(mode=Mode.SUBTRACT)
        with Locations(Location((-20.6375, 71.5645, 0), (0, 0, 90))):
            Circle(SKETCH119_R, mode=Mode.SUBTRACT)
        with Locations(Location((20.6375, 71.5645, 0), (0, 0, 90))):
            Circle(SKETCH119_R, mode=Mode.SUBTRACT)
    extrude(amount=-CUT_EXTRUDE62_DEPTH, mode=Mode.SUBTRACT)

    # Sketch120 → Cut-Extrude63 (cut, through all)
    with BuildSketch(Plane.XZ.offset(-25.4)):
        with BuildLine():
            Line((-10.217726595, 45.775374384), (-7.104183749, 49.83302242))
            ThreePointArc((-7.104183749, 49.83302242), (-6.454943705, 49.375251561), (-5.844735322, 48.866613652))
            Line((-5.844735322, 48.866613652), (-8.958278167, 44.808965616))
            ThreePointArc((-8.958278167, 44.808965616), (-9.547451764, 45.345016593), (-10.217726595, 45.775374384))
        make_face()
    extrude(amount=-CUT_EXTRUDE63_DEPTH, mode=Mode.SUBTRACT)


with BuildPart() as body_2:
    # Sketch116 → Boss-Extrude32 (new body)
    with BuildSketch(Plane(origin=(0, 28.575, 0), x_dir=(1, 0, 0), z_dir=(0, 1, 0)).offset(BOSS_EXTRUDE32_START)):
        Polygon((-25.4, -66.802), (25.4, -66.802), (47.397045256, -104.902), (37.31895, -122.357773027), (37.31895, -143.002), (37.31895, -152.4), (12.4206, -152.4), (12.4206, -155.5496), (-12.4206, -155.5496), (-12.4206, -152.4), (-37.31895, -152.4), (-37.31895, -143.002), (-37.31895, -122.357773027), (-47.397045256, -104.902), align=None)
        with Locations(Location((30.96895, -147.7645, 0), (0, 0, 270))):
            Circle(SKETCH116_R, mode=Mode.SUBTRACT)
        with Locations(Location((-30.96895, -147.7645, 0), (0, 0, 90))):
            Circle(SKETCH116_R, mode=Mode.SUBTRACT)
        with Locations(Location((20.6375, -71.5645, 0), (0, 0, 270))):
            Circle(SKETCH116_R, mode=Mode.SUBTRACT)
        with Locations(Location((-20.6375, -71.5645, 0), (0, 0, 270))):
            Circle(SKETCH116_R, mode=Mode.SUBTRACT)
    extrude(amount=BOSS_EXTRUDE32_DEPTH)

    # Sketch118 → Boss-Extrude33 (add)
    with BuildSketch(Plane(origin=(0, 30.734, 0), x_dir=(1, 0, 0), z_dir=(0, 1, 0)).offset(BOSS_EXTRUDE33_START)):
        with BuildLine():
            Line((10.280494061, -21.726298825), (-7.834850838, -35.626691862))
            ThreePointArc((-7.834850838, -35.626691862), (-8.790052591, -37.200993094), (-8.430538117, -39.006978725))
            ThreePointArc((-8.430538117, -39.006978725), (-9.547451764, -45.345016593), (-15.958604753, -44.783467422))
            ThreePointArc((-15.958604753, -44.783467422), (-17.610003723, -43.96877963), (-19.377886346, -44.483974531))
            Line((-19.377886346, -44.483974531), (-34.027546755, -55.725054327))
            ThreePointArc((-34.027546755, -55.725054327), (-34.700321183, -56.095022456), (-35.452908035, -56.247058232))
            ThreePointArc((-35.452908035, -56.247058232), (-41.29836226, -60.999749867), (-38.49041558, -67.990661703))
            Line((-38.49041558, -67.990661703), (-29.3497017, -73.64308402))
            Line((-29.3497017, -73.64308402), (-25.4, -66.802))
            Line((-25.4, -66.802), (25.4, -66.802))
            Line((25.4, -66.802), (16.356889842, -51.138873748))
            ThreePointArc((16.356889842, -51.138873748), (14.255494678, -38.410910939), (21.067711154, -27.455975724))
            ThreePointArc((21.067711154, -27.455975724), (20.854631298, -17.223825423), (11.153621759, -20.484610104))
            ThreePointArc((11.153621759, -20.484610104), (10.811982667, -21.172203427), (10.280494061, -21.726298825))
        make_face()
        with Locations(Location((17.20207608, -22.418182013, 0), (0, 0, 270))):
            Circle(SKETCH118_R, mode=Mode.SUBTRACT)
        with Locations(Location((-35.150676163, -62.589861704, 0), (0, 0, 270))):
            Circle(SKETCH118_R, mode=Mode.SUBTRACT)
        with BuildLine():
            Line((-5.00888, -60.19546), (-5.00888, -61.78296))
            ThreePointArc((-5.00888, -61.78296), (-1.83388, -64.95796), (1.34112, -61.78296))
            Line((1.34112, -61.78296), (1.34112, -60.19546))
            ThreePointArc((1.34112, -60.19546), (-1.83388, -57.02046), (-5.00888, -60.19546))
        make_face(mode=Mode.SUBTRACT)
    extrude(amount=-BOSS_EXTRUDE33_DEPTH)

    # DeleteFace1 outline → DeleteFace1 (add)
    with BuildSketch(Plane(origin=(0, 0, 0), x_dir=(1, 0, 0), z_dir=(0, 1, 0)).offset(DELETEFACE1_START)):
        with Locations((20.6375, -71.5645)):
            Circle(DELETEFACE1_OUTLINE_R)
        with Locations((-20.6375, -71.5645)):
            Circle(DELETEFACE1_OUTLINE_R)
    extrude(amount=DELETEFACE1_DEPTH)

    # Fillet44
    fillet44_edges = [body_2.edges().sort_by_distance(p)[0] for p in [
        (47.397045256, 32.3215, 104.902),
        (37.31895, 32.3215, 122.357773027),
        (-37.31895, 32.3215, 122.357773027),
        (-47.397045256, 32.3215, 104.902),
        (-29.3497017, 32.3215, 73.64308402),
    ]]
    fillet(fillet44_edges, radius=FILLET44_R)

    # Fillet49
    fillet49_edges = [body_2.edges().sort_by_distance(p)[0] for p in [
        (37.31895, 32.3215, 152.4),
        (-37.31895, 32.3215, 152.4),
    ]]
    fillet(fillet49_edges, radius=FILLET49_R)


with BuildPart() as cut_extrude63_piece_1:
    # of the separate pieces the step leaves, piece 1, a body of its own (cut_extrude63_pieces)
    add(part.part.solids().sort_by_distance((26.919769024, 25.4, 152.4))[0])

    # Fillet46
    fillet46_edges = [cut_extrude63_piece_1.edges().sort_by_distance(p)[0] for p in [
        (-5.844735322, 26.9875, 48.866613652),
        (-8.958278167, 26.9875, 44.808965616),
    ]]
    fillet(fillet46_edges, radius=FILLET46_R)

    # Fillet48
    fillet48_edges = [cut_extrude63_piece_1.edges().sort_by_distance(p)[0] for p in [
        (3.843489743, 26.9875, 34.669585789),
        (-2.773809056, 26.9875, 39.747217744),
    ]]
    fillet(fillet48_edges, radius=FILLET48_R)


with BuildPart() as cut_extrude63_piece_2:
    # of the separate pieces the step leaves, piece 2, a body of its own (cut_extrude63_pieces)
    add(part.part.solids().sort_by_distance((-16.707657981, 25.4, 50.439036071))[0])

    # Sketch121 → Cut-Extrude64 (cut, through all)
    with BuildSketch(Plane.XZ.offset(-25.4)):
        with BuildLine():
            Line((-28.719749725, 51.652238419), (-24.854114651, 56.69003213))
            Line((-24.854114651, 56.69003213), (-16.707657981, 50.439036071))
            ThreePointArc((-16.707657981, 50.439036071), (-11.826813979, 51.389632918), (-7.104183749, 49.83302242))
            Line((-7.104183749, 49.83302242), (-10.217726595, 45.775374384))
            ThreePointArc((-10.217726595, 45.775374384), (-13.257527132, 46.259637328), (-15.958604753, 44.783467422))
            ThreePointArc((-15.958604753, 44.783467422), (-17.610003723, 43.96877963), (-19.377886346, 44.483974531))
            Line((-19.377886346, 44.483974531), (-28.719749725, 51.652238419))
        make_face()
    extrude(amount=-CUT_EXTRUDE64_DEPTH, mode=Mode.SUBTRACT)

    # Fillet45
    fillet45_edges = [cut_extrude63_piece_2.edges().sort_by_distance(p)[0] for p in [
        (-24.854114651, 26.9875, 56.69003213),
        (-28.719749725, 26.9875, 51.652238419),
    ]]
    fillet(fillet45_edges, radius=FILLET45_R)

    # Fillet47
    fillet47_edges = [cut_extrude63_piece_2.edges().sort_by_distance(p)[0] for p in [
        (-28.410372496, 26.9875, 77.220674902),
        (-28.410372496, 26.9875, 59.418844751),
    ]]
    fillet(fillet47_edges, radius=FILLET47_R)


with BuildPart() as body_4:
    # Sketch122 → Boss-Extrude34 (new body)
    with BuildSketch(Plane(origin=(0, 28.575, 0), x_dir=(1, 0, 0), z_dir=(0, 1, 0))):
        with BuildLine():
            Line((32.670427372, -117.709250399), (40.064696837, -104.902))
            Line((40.064696837, -104.902), (10.857628528, -54.313873748))
            ThreePointArc((10.857628528, -54.313873748), (7.556793363, -41.589482586), (11.262241834, -28.976977092))
            Line((11.262241834, -28.976977092), (-1.660608663, -38.893029039))
            ThreePointArc((-1.660608663, -38.893029039), (-5.68181669, -50.382810304), (-17.820858374, -51.293224775))
            Line((-17.820858374, -51.293224775), (-29.306444608, -60.106425066))
            ThreePointArc((-29.306444608, -60.106425066), (-28.823969902, -63.133265681), (-29.815524153, -66.033501209))
            ThreePointArc((-29.815524153, -66.033501209), (-25.428001423, -73.566513401), (-26.930897762, -82.153592705))
            Line((-26.930897762, -82.153592705), (-40.064696837, -104.902))
            Line((-40.064696837, -104.902), (-32.670427372, -117.709250399))
            ThreePointArc((-32.670427372, -117.709250399), (-31.401692006, -120.772248526), (-30.96895, -124.059250399))
            Line((-30.96895, -124.059250399), (-30.96895, -141.4145))
            ThreePointArc((-30.96895, -141.4145), (-25.063108612, -145.43136102), (-26.629060629, -152.4))
            Line((-26.629060629, -152.4), (-34.77895, -152.4))
            ThreePointArc((-34.77895, -152.4), (-36.575001224, -151.656051224), (-37.31895, -149.86))
            Line((-37.31895, -149.86), (-37.31895, -124.059250399))
            ThreePointArc((-37.31895, -124.059250399), (-37.535321003, -122.415749463), (-38.169688686, -120.884250399))
            Line((-38.169688686, -120.884250399), (-45.563958151, -108.077))
            ThreePointArc((-45.563958151, -108.077), (-46.414696837, -104.902), (-45.563958151, -101.727))
            Line((-45.563958151, -101.727), (-32.430159076, -78.978592705))
            ThreePointArc((-32.430159076, -78.978592705), (-31.771655383, -74.252970213), (-34.589680973, -70.402792707))
            Line((-34.589680973, -70.402792707), (-38.49041558, -67.990661703))
            ThreePointArc((-38.49041558, -67.990661703), (-41.29836226, -60.999749867), (-35.452908035, -56.247058232))
            ThreePointArc((-35.452908035, -56.247058232), (-34.700321183, -56.095022456), (-34.027546755, -55.725054327))
            Line((-34.027546755, -55.725054327), (-19.377886346, -44.483974531))
            ThreePointArc((-19.377886346, -44.483974531), (-17.610003723, -43.96877963), (-15.958604753, -44.783467422))
            ThreePointArc((-15.958604753, -44.783467422), (-9.547451764, -45.345016593), (-8.430538117, -39.006978725))
            ThreePointArc((-8.430538117, -39.006978725), (-8.790052591, -37.200993094), (-7.834850838, -35.626691862))
            Line((-7.834850838, -35.626691862), (10.280494061, -21.726298825))
            ThreePointArc((10.280494061, -21.726298825), (10.811982667, -21.172203427), (11.153621759, -20.484610104))
            ThreePointArc((11.153621759, -20.484610104), (20.854631298, -17.223825423), (21.067711154, -27.455975724))
            ThreePointArc((21.067711154, -27.455975724), (14.255494678, -38.410910939), (16.356889842, -51.138873748))
            Line((16.356889842, -51.138873748), (45.563958151, -101.727))
            ThreePointArc((45.563958151, -101.727), (46.414696837, -104.902), (45.563958151, -108.077))
            Line((45.563958151, -108.077), (38.169688686, -120.884250399))
            ThreePointArc((38.169688686, -120.884250399), (37.535321003, -122.415749463), (37.31895, -124.059250399))
            Line((37.31895, -124.059250399), (37.31895, -149.86))
            ThreePointArc((37.31895, -149.86), (36.575001224, -151.656051224), (34.77895, -152.4))
            Line((34.77895, -152.4), (26.629060629, -152.4))
            ThreePointArc((26.629060629, -152.4), (25.063108612, -145.43136102), (30.96895, -141.4145))
            Line((30.96895, -141.4145), (30.96895, -124.059250399))
            ThreePointArc((30.96895, -124.059250399), (31.401692006, -120.772248526), (32.670427372, -117.709250399))
        make_face()
        with Locations(Location((17.20207608, -22.418182013, 0), (0, 0, 90))):
            Circle(SKETCH122_R, mode=Mode.SUBTRACT)
        with Locations(Location((-35.150676163, -62.589861704, 0), (0, 0, 90))):
            Circle(SKETCH122_R, mode=Mode.SUBTRACT)
        with Locations(Location((-30.96895, -147.7645, 0), (0, 0, 90))):
            Circle(SKETCH122_R, mode=Mode.SUBTRACT)
        with Locations(Location((30.96895, -147.7645, 0), (0, 0, 90))):
            Circle(SKETCH122_R, mode=Mode.SUBTRACT)
    extrude(amount=BOSS_EXTRUDE34_DEPTH)


solid = body_4.part
